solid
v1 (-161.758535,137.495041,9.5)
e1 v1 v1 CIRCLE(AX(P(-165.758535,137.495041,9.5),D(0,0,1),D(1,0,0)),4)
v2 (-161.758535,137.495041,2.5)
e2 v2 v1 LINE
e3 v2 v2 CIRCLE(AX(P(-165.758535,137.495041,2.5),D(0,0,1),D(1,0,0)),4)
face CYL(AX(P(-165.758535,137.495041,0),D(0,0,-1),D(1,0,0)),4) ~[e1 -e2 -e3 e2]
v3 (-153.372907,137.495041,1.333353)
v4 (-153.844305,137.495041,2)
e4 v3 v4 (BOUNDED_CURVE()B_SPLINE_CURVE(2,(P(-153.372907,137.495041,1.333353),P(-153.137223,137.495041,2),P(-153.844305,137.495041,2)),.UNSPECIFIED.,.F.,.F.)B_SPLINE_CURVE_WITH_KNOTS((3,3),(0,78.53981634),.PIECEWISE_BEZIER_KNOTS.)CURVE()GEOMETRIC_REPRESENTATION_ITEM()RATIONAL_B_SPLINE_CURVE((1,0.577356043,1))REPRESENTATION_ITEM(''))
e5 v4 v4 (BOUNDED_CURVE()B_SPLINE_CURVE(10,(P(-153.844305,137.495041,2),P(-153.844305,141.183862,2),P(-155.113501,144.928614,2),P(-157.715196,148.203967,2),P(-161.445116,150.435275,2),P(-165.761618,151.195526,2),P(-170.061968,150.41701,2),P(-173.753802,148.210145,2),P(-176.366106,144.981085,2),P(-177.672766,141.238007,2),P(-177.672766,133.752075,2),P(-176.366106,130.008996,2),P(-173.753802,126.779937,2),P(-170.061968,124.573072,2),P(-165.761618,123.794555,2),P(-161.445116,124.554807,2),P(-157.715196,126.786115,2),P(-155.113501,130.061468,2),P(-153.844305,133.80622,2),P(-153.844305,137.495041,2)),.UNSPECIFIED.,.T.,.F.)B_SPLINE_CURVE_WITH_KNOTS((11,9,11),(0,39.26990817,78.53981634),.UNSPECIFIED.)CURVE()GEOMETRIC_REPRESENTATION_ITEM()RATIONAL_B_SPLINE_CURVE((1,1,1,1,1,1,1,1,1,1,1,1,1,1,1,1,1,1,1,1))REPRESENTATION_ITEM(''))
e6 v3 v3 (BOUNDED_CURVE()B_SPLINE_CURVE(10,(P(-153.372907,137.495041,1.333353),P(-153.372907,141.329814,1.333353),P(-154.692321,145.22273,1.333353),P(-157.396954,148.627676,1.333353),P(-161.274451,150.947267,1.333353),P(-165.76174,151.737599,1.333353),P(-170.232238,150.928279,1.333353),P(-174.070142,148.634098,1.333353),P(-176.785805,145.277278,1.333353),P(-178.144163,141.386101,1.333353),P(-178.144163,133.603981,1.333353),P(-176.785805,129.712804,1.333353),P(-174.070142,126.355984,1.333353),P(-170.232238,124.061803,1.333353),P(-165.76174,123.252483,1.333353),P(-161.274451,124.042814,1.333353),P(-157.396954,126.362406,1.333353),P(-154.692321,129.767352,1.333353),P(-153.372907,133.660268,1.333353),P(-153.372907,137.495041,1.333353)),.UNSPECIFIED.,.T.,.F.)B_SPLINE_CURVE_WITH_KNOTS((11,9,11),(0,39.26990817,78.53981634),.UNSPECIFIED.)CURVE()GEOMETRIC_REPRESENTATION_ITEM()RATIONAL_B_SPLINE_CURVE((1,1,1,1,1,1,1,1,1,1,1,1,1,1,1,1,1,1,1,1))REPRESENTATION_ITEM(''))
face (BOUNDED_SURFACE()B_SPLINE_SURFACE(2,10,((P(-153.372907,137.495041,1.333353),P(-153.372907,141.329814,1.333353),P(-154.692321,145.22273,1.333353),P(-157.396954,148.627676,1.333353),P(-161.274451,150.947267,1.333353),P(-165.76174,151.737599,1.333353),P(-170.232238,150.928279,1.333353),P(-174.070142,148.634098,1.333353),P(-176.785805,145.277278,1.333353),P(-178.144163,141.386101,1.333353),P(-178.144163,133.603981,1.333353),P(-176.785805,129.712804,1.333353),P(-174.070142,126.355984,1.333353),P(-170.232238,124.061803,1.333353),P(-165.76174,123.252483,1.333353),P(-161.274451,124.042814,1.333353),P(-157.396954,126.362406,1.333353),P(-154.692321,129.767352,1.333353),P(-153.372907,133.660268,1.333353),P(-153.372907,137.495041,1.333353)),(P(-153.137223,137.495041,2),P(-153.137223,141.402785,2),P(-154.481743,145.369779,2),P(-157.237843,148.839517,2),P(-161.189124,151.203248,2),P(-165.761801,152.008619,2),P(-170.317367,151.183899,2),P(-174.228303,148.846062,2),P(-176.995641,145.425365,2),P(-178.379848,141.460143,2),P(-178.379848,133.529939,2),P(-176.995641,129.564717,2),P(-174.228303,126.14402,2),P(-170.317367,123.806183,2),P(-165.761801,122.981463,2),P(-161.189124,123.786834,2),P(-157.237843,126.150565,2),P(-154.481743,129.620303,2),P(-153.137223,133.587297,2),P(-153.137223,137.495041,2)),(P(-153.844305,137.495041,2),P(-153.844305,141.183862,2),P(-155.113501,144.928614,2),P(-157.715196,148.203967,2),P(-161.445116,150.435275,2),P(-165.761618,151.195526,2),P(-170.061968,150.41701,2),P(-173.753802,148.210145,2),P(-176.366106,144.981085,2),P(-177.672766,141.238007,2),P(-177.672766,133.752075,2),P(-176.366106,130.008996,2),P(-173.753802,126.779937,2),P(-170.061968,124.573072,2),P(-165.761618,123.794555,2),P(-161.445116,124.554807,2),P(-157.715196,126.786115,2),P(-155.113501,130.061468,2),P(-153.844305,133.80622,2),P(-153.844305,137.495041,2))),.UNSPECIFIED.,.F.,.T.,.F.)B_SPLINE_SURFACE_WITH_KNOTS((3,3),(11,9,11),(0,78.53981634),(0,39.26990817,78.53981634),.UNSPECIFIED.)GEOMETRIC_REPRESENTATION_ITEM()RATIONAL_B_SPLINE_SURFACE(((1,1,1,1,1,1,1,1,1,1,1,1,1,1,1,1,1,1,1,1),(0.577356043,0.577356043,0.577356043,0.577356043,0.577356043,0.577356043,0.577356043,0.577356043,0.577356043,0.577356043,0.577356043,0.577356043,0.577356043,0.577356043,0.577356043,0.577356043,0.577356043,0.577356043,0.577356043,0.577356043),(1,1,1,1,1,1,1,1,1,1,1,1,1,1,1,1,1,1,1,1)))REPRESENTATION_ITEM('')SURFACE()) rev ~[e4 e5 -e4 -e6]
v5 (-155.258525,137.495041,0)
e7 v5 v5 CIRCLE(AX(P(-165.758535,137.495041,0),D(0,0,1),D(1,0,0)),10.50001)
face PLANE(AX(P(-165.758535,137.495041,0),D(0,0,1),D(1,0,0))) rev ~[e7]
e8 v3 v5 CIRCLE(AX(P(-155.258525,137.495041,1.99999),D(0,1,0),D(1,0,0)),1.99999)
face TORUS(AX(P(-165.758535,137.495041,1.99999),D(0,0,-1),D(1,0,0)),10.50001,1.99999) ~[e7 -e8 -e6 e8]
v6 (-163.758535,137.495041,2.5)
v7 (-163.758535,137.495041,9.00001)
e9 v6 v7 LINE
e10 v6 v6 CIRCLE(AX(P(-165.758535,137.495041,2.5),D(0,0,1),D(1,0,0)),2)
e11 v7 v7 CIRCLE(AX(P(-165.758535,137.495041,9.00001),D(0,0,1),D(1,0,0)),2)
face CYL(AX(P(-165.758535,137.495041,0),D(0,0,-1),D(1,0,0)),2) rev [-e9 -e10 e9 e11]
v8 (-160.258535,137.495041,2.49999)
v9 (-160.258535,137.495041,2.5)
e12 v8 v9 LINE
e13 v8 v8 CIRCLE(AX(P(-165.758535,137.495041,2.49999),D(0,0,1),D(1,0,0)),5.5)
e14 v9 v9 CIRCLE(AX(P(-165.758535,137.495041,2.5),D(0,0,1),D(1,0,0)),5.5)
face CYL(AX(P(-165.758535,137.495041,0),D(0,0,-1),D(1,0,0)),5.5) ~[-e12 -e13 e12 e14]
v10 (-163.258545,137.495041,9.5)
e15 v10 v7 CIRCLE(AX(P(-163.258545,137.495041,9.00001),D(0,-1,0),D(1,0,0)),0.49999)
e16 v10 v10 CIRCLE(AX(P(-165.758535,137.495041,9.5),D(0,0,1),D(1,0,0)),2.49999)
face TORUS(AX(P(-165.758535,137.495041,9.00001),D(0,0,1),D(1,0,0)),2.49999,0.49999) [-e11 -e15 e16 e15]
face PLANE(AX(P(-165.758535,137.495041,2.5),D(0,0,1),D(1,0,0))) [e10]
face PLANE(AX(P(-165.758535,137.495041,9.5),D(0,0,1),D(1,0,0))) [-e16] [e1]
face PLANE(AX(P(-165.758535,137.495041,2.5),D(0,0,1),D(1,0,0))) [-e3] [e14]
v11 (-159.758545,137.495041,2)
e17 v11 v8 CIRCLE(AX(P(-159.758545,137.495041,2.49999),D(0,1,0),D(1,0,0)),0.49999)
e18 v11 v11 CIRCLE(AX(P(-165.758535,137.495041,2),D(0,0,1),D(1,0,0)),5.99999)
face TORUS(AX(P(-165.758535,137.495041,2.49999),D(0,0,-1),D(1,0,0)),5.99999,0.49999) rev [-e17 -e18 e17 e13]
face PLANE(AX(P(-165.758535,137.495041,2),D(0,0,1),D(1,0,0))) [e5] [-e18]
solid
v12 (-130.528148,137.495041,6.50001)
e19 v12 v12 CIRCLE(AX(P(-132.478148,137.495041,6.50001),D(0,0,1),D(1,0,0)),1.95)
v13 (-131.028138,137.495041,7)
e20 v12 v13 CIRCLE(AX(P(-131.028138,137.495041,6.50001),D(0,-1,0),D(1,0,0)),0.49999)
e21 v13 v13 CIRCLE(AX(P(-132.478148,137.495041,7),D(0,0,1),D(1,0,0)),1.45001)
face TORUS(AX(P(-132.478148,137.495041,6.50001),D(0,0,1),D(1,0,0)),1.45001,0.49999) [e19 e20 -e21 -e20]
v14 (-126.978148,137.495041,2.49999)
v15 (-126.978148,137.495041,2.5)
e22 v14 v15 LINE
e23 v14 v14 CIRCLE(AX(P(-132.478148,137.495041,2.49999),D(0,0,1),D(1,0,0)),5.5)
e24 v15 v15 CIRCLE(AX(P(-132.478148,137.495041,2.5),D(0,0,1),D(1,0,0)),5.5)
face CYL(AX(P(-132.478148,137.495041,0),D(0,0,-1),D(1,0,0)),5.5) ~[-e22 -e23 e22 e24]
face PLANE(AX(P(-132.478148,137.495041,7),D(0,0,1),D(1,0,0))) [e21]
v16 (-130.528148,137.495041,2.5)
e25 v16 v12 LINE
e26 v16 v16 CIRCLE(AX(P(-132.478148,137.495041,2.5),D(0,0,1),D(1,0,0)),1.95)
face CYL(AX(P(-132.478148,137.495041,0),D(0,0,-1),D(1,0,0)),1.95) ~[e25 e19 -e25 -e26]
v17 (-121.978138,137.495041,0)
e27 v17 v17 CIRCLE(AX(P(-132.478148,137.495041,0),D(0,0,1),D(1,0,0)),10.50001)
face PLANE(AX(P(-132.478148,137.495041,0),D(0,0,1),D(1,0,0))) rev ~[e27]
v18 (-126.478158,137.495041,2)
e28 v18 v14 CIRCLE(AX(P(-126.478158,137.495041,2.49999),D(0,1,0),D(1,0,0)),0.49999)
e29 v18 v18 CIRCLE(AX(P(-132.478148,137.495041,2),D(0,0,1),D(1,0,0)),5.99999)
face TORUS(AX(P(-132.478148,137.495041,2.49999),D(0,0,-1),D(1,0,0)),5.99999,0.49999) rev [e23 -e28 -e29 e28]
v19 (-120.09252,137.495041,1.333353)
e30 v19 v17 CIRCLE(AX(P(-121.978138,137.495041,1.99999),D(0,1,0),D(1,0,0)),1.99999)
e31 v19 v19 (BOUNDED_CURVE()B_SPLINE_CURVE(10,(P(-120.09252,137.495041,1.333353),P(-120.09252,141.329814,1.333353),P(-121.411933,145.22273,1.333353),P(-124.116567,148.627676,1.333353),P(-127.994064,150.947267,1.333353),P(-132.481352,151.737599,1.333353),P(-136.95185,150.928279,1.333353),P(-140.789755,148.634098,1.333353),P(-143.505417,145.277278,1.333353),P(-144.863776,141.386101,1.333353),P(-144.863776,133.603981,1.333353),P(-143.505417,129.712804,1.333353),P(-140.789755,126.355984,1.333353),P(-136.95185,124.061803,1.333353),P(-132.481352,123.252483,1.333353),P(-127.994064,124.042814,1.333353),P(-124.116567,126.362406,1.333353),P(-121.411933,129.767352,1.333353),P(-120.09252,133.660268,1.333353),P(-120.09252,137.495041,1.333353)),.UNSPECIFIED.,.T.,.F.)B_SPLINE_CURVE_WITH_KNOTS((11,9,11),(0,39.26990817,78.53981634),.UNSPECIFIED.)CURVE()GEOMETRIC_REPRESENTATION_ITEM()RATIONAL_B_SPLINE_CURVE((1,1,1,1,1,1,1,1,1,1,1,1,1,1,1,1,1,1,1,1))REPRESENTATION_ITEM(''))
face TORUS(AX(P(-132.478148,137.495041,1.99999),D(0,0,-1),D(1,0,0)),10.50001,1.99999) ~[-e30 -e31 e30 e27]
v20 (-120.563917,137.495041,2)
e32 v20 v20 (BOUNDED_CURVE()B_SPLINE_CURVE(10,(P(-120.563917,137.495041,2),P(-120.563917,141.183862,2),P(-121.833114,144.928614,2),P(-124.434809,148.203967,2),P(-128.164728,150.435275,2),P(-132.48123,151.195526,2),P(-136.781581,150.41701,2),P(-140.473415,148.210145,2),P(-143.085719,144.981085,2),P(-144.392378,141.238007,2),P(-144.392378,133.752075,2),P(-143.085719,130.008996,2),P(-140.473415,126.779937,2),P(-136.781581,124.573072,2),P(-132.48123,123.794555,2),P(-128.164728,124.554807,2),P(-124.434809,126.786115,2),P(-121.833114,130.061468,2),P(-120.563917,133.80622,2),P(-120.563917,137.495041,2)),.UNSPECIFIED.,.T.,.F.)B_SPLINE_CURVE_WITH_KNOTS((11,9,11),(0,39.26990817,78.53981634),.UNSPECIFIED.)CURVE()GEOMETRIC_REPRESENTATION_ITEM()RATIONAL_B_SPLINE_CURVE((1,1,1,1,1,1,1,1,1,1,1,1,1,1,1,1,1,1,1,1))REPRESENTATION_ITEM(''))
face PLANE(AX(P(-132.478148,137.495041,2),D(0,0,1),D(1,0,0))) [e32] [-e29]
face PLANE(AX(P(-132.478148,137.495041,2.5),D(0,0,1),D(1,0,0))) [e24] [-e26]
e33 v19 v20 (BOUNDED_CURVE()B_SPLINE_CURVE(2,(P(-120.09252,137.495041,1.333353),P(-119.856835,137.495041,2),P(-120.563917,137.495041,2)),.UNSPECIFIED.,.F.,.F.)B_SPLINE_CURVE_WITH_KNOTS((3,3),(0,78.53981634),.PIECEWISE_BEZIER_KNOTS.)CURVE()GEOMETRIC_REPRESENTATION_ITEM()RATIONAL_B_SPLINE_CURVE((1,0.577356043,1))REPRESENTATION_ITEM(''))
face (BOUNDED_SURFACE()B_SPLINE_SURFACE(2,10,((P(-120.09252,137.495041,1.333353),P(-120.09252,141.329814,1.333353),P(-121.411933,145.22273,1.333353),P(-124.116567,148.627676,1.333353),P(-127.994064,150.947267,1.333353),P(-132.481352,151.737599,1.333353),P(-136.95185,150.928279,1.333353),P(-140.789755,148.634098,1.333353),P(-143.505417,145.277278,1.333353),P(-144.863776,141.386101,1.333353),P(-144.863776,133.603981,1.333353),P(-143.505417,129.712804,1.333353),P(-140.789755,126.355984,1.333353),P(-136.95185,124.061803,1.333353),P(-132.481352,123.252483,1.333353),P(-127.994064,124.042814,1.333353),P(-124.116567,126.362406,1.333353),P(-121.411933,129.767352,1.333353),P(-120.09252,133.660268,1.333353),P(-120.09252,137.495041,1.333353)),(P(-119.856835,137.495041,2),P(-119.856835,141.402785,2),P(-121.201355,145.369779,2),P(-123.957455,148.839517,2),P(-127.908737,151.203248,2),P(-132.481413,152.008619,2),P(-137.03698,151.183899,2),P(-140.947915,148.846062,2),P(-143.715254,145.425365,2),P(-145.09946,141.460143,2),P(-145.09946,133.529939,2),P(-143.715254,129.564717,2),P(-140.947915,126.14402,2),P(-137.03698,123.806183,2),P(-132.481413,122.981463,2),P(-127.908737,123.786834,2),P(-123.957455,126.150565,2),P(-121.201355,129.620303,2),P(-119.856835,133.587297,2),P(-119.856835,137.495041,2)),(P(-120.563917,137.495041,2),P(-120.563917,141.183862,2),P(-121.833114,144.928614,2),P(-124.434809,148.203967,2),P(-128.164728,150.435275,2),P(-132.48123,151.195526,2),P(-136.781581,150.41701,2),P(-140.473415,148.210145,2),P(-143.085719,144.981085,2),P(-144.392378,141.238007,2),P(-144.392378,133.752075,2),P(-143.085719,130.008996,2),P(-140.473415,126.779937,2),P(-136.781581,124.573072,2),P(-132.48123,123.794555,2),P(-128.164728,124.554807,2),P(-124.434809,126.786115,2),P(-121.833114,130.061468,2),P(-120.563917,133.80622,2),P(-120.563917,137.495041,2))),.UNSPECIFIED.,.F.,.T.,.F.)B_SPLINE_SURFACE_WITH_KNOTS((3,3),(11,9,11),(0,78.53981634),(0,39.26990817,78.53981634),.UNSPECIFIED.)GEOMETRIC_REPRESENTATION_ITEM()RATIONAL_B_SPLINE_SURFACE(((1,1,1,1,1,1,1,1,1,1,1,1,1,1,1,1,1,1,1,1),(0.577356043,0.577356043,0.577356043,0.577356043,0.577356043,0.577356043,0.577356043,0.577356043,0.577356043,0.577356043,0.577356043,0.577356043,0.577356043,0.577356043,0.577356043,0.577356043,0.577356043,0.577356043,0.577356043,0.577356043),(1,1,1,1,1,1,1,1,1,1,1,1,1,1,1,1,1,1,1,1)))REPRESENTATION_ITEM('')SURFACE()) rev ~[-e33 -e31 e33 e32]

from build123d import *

# Parameters (mm, degrees)
F0_R     = 12.5
F0_R_2   = 5.5
F1_DEPTH = 2
F0_R_3   = 4
F2_DEPTH = 2.5
F0_R_4   = 1.95
F0_R_5   = 2
F3_DEPTH = 9.5
F4_DEPTH = 7
F7_R     = 1.99999
F8_R     = 0.49999


# Not quite as in the source:
# - a fillet or chamfer is up to 0.001 mm smaller than in the source, because OpenCascade refuses the exact size


with BuildPart() as f1:
    # F0 (on Top) → F1 (new body)
    with BuildSketch(Plane.XY):
        with Locations((-165.7585352659, 137.4950408936)):
            Circle(F0_R)
        with Locations((-165.7585352659, 137.4950408936)):
            Circle(F0_R_2, mode=Mode.SUBTRACT)
    extrude(amount=F1_DEPTH)


with BuildPart() as f1b:
    # F0 (on Top) → F1, piece 2 (new body)
    with BuildSketch(Plane.XY):
        with Locations((-132.4781477451, 137.4950408936)):
            Circle(F0_R)
        with Locations((-132.4781477451, 137.4950408936)):
            Circle(F0_R_2, mode=Mode.SUBTRACT)
    extrude(amount=F1_DEPTH)


with BuildPart() as f2:
    # F0 (on Top) → F2 (new body)
    with BuildSketch(Plane.XY):
        with Locations((-165.7585352659, 137.4950408936)):
            Circle(F0_R_2)
        with Locations((-165.7585352659, 137.4950408936)):
            Circle(F0_R_3, mode=Mode.SUBTRACT)
    extrude(amount=F2_DEPTH)


with BuildPart() as f2b:
    # F0 (on Top) → F2, piece 2 (new body)
    with BuildSketch(Plane.XY):
        with Locations((-132.4781477451, 137.4950408936)):
            Circle(F0_R_2)
        with Locations((-132.4781477451, 137.4950408936)):
            Circle(F0_R_4, mode=Mode.SUBTRACT)
    extrude(amount=F2_DEPTH)

    # F0 (on Top) → F4 (join)
    with BuildSketch(Plane.XY):
        with Locations((-132.4781477451, 137.4950408936)):
            Circle(F0_R_4)
    extrude(amount=F4_DEPTH)


with BuildPart() as f2c:
    # F0 (on Top) → F2, piece 3 (new body)
    with BuildSketch(Plane.XY):
        with Locations((-165.7585352659, 137.4950408936)):
            Circle(F0_R_5)
    extrude(amount=F2_DEPTH)


with BuildPart() as f3:
    # F0 (on Top) → F3 (new body)
    with BuildSketch(Plane.XY):
        with Locations((-165.7585352659, 137.4950408936)):
            Circle(F0_R_3)
        with Locations((-165.7585352659, 137.4950408936)):
            Circle(F0_R_5, mode=Mode.SUBTRACT)
    extrude(amount=F3_DEPTH)

    # F5: union F2c, F1, F2
    add(f2c.part)
    add(f1.part)
    add(f2.part)

    # F6: union F2b, F1b
    add(f2b.part)
    add(f1b.part)

    # F7 (radius 2 in the source; OpenCascade refuses exactly that, so slightly less here)
    f7_edges = [f3.edges().sort_by_distance(p)[0] for p in [
        (-144.978148, 137.495041, 0),
        (-178.258535, 137.495041, 0),
    ]]
    fillet(f7_edges, radius=F7_R)

    # F8 (radius 0.5 in the source; OpenCascade refuses exactly that, so slightly less here)
    f8_edges = [f3.edges().sort_by_distance(p)[0] for p in [
        (-178.258535, 137.495041, 2),
        (-171.258535, 137.495041, 2),
        (-144.978148, 137.495041, 2),
        (-137.978148, 137.495041, 2),
        (-134.428148, 137.495041, 7),
        (-167.758535, 137.495041, 9.5),
    ]]
    fillet(f8_edges, radius=F8_R)


solid = f3.part
